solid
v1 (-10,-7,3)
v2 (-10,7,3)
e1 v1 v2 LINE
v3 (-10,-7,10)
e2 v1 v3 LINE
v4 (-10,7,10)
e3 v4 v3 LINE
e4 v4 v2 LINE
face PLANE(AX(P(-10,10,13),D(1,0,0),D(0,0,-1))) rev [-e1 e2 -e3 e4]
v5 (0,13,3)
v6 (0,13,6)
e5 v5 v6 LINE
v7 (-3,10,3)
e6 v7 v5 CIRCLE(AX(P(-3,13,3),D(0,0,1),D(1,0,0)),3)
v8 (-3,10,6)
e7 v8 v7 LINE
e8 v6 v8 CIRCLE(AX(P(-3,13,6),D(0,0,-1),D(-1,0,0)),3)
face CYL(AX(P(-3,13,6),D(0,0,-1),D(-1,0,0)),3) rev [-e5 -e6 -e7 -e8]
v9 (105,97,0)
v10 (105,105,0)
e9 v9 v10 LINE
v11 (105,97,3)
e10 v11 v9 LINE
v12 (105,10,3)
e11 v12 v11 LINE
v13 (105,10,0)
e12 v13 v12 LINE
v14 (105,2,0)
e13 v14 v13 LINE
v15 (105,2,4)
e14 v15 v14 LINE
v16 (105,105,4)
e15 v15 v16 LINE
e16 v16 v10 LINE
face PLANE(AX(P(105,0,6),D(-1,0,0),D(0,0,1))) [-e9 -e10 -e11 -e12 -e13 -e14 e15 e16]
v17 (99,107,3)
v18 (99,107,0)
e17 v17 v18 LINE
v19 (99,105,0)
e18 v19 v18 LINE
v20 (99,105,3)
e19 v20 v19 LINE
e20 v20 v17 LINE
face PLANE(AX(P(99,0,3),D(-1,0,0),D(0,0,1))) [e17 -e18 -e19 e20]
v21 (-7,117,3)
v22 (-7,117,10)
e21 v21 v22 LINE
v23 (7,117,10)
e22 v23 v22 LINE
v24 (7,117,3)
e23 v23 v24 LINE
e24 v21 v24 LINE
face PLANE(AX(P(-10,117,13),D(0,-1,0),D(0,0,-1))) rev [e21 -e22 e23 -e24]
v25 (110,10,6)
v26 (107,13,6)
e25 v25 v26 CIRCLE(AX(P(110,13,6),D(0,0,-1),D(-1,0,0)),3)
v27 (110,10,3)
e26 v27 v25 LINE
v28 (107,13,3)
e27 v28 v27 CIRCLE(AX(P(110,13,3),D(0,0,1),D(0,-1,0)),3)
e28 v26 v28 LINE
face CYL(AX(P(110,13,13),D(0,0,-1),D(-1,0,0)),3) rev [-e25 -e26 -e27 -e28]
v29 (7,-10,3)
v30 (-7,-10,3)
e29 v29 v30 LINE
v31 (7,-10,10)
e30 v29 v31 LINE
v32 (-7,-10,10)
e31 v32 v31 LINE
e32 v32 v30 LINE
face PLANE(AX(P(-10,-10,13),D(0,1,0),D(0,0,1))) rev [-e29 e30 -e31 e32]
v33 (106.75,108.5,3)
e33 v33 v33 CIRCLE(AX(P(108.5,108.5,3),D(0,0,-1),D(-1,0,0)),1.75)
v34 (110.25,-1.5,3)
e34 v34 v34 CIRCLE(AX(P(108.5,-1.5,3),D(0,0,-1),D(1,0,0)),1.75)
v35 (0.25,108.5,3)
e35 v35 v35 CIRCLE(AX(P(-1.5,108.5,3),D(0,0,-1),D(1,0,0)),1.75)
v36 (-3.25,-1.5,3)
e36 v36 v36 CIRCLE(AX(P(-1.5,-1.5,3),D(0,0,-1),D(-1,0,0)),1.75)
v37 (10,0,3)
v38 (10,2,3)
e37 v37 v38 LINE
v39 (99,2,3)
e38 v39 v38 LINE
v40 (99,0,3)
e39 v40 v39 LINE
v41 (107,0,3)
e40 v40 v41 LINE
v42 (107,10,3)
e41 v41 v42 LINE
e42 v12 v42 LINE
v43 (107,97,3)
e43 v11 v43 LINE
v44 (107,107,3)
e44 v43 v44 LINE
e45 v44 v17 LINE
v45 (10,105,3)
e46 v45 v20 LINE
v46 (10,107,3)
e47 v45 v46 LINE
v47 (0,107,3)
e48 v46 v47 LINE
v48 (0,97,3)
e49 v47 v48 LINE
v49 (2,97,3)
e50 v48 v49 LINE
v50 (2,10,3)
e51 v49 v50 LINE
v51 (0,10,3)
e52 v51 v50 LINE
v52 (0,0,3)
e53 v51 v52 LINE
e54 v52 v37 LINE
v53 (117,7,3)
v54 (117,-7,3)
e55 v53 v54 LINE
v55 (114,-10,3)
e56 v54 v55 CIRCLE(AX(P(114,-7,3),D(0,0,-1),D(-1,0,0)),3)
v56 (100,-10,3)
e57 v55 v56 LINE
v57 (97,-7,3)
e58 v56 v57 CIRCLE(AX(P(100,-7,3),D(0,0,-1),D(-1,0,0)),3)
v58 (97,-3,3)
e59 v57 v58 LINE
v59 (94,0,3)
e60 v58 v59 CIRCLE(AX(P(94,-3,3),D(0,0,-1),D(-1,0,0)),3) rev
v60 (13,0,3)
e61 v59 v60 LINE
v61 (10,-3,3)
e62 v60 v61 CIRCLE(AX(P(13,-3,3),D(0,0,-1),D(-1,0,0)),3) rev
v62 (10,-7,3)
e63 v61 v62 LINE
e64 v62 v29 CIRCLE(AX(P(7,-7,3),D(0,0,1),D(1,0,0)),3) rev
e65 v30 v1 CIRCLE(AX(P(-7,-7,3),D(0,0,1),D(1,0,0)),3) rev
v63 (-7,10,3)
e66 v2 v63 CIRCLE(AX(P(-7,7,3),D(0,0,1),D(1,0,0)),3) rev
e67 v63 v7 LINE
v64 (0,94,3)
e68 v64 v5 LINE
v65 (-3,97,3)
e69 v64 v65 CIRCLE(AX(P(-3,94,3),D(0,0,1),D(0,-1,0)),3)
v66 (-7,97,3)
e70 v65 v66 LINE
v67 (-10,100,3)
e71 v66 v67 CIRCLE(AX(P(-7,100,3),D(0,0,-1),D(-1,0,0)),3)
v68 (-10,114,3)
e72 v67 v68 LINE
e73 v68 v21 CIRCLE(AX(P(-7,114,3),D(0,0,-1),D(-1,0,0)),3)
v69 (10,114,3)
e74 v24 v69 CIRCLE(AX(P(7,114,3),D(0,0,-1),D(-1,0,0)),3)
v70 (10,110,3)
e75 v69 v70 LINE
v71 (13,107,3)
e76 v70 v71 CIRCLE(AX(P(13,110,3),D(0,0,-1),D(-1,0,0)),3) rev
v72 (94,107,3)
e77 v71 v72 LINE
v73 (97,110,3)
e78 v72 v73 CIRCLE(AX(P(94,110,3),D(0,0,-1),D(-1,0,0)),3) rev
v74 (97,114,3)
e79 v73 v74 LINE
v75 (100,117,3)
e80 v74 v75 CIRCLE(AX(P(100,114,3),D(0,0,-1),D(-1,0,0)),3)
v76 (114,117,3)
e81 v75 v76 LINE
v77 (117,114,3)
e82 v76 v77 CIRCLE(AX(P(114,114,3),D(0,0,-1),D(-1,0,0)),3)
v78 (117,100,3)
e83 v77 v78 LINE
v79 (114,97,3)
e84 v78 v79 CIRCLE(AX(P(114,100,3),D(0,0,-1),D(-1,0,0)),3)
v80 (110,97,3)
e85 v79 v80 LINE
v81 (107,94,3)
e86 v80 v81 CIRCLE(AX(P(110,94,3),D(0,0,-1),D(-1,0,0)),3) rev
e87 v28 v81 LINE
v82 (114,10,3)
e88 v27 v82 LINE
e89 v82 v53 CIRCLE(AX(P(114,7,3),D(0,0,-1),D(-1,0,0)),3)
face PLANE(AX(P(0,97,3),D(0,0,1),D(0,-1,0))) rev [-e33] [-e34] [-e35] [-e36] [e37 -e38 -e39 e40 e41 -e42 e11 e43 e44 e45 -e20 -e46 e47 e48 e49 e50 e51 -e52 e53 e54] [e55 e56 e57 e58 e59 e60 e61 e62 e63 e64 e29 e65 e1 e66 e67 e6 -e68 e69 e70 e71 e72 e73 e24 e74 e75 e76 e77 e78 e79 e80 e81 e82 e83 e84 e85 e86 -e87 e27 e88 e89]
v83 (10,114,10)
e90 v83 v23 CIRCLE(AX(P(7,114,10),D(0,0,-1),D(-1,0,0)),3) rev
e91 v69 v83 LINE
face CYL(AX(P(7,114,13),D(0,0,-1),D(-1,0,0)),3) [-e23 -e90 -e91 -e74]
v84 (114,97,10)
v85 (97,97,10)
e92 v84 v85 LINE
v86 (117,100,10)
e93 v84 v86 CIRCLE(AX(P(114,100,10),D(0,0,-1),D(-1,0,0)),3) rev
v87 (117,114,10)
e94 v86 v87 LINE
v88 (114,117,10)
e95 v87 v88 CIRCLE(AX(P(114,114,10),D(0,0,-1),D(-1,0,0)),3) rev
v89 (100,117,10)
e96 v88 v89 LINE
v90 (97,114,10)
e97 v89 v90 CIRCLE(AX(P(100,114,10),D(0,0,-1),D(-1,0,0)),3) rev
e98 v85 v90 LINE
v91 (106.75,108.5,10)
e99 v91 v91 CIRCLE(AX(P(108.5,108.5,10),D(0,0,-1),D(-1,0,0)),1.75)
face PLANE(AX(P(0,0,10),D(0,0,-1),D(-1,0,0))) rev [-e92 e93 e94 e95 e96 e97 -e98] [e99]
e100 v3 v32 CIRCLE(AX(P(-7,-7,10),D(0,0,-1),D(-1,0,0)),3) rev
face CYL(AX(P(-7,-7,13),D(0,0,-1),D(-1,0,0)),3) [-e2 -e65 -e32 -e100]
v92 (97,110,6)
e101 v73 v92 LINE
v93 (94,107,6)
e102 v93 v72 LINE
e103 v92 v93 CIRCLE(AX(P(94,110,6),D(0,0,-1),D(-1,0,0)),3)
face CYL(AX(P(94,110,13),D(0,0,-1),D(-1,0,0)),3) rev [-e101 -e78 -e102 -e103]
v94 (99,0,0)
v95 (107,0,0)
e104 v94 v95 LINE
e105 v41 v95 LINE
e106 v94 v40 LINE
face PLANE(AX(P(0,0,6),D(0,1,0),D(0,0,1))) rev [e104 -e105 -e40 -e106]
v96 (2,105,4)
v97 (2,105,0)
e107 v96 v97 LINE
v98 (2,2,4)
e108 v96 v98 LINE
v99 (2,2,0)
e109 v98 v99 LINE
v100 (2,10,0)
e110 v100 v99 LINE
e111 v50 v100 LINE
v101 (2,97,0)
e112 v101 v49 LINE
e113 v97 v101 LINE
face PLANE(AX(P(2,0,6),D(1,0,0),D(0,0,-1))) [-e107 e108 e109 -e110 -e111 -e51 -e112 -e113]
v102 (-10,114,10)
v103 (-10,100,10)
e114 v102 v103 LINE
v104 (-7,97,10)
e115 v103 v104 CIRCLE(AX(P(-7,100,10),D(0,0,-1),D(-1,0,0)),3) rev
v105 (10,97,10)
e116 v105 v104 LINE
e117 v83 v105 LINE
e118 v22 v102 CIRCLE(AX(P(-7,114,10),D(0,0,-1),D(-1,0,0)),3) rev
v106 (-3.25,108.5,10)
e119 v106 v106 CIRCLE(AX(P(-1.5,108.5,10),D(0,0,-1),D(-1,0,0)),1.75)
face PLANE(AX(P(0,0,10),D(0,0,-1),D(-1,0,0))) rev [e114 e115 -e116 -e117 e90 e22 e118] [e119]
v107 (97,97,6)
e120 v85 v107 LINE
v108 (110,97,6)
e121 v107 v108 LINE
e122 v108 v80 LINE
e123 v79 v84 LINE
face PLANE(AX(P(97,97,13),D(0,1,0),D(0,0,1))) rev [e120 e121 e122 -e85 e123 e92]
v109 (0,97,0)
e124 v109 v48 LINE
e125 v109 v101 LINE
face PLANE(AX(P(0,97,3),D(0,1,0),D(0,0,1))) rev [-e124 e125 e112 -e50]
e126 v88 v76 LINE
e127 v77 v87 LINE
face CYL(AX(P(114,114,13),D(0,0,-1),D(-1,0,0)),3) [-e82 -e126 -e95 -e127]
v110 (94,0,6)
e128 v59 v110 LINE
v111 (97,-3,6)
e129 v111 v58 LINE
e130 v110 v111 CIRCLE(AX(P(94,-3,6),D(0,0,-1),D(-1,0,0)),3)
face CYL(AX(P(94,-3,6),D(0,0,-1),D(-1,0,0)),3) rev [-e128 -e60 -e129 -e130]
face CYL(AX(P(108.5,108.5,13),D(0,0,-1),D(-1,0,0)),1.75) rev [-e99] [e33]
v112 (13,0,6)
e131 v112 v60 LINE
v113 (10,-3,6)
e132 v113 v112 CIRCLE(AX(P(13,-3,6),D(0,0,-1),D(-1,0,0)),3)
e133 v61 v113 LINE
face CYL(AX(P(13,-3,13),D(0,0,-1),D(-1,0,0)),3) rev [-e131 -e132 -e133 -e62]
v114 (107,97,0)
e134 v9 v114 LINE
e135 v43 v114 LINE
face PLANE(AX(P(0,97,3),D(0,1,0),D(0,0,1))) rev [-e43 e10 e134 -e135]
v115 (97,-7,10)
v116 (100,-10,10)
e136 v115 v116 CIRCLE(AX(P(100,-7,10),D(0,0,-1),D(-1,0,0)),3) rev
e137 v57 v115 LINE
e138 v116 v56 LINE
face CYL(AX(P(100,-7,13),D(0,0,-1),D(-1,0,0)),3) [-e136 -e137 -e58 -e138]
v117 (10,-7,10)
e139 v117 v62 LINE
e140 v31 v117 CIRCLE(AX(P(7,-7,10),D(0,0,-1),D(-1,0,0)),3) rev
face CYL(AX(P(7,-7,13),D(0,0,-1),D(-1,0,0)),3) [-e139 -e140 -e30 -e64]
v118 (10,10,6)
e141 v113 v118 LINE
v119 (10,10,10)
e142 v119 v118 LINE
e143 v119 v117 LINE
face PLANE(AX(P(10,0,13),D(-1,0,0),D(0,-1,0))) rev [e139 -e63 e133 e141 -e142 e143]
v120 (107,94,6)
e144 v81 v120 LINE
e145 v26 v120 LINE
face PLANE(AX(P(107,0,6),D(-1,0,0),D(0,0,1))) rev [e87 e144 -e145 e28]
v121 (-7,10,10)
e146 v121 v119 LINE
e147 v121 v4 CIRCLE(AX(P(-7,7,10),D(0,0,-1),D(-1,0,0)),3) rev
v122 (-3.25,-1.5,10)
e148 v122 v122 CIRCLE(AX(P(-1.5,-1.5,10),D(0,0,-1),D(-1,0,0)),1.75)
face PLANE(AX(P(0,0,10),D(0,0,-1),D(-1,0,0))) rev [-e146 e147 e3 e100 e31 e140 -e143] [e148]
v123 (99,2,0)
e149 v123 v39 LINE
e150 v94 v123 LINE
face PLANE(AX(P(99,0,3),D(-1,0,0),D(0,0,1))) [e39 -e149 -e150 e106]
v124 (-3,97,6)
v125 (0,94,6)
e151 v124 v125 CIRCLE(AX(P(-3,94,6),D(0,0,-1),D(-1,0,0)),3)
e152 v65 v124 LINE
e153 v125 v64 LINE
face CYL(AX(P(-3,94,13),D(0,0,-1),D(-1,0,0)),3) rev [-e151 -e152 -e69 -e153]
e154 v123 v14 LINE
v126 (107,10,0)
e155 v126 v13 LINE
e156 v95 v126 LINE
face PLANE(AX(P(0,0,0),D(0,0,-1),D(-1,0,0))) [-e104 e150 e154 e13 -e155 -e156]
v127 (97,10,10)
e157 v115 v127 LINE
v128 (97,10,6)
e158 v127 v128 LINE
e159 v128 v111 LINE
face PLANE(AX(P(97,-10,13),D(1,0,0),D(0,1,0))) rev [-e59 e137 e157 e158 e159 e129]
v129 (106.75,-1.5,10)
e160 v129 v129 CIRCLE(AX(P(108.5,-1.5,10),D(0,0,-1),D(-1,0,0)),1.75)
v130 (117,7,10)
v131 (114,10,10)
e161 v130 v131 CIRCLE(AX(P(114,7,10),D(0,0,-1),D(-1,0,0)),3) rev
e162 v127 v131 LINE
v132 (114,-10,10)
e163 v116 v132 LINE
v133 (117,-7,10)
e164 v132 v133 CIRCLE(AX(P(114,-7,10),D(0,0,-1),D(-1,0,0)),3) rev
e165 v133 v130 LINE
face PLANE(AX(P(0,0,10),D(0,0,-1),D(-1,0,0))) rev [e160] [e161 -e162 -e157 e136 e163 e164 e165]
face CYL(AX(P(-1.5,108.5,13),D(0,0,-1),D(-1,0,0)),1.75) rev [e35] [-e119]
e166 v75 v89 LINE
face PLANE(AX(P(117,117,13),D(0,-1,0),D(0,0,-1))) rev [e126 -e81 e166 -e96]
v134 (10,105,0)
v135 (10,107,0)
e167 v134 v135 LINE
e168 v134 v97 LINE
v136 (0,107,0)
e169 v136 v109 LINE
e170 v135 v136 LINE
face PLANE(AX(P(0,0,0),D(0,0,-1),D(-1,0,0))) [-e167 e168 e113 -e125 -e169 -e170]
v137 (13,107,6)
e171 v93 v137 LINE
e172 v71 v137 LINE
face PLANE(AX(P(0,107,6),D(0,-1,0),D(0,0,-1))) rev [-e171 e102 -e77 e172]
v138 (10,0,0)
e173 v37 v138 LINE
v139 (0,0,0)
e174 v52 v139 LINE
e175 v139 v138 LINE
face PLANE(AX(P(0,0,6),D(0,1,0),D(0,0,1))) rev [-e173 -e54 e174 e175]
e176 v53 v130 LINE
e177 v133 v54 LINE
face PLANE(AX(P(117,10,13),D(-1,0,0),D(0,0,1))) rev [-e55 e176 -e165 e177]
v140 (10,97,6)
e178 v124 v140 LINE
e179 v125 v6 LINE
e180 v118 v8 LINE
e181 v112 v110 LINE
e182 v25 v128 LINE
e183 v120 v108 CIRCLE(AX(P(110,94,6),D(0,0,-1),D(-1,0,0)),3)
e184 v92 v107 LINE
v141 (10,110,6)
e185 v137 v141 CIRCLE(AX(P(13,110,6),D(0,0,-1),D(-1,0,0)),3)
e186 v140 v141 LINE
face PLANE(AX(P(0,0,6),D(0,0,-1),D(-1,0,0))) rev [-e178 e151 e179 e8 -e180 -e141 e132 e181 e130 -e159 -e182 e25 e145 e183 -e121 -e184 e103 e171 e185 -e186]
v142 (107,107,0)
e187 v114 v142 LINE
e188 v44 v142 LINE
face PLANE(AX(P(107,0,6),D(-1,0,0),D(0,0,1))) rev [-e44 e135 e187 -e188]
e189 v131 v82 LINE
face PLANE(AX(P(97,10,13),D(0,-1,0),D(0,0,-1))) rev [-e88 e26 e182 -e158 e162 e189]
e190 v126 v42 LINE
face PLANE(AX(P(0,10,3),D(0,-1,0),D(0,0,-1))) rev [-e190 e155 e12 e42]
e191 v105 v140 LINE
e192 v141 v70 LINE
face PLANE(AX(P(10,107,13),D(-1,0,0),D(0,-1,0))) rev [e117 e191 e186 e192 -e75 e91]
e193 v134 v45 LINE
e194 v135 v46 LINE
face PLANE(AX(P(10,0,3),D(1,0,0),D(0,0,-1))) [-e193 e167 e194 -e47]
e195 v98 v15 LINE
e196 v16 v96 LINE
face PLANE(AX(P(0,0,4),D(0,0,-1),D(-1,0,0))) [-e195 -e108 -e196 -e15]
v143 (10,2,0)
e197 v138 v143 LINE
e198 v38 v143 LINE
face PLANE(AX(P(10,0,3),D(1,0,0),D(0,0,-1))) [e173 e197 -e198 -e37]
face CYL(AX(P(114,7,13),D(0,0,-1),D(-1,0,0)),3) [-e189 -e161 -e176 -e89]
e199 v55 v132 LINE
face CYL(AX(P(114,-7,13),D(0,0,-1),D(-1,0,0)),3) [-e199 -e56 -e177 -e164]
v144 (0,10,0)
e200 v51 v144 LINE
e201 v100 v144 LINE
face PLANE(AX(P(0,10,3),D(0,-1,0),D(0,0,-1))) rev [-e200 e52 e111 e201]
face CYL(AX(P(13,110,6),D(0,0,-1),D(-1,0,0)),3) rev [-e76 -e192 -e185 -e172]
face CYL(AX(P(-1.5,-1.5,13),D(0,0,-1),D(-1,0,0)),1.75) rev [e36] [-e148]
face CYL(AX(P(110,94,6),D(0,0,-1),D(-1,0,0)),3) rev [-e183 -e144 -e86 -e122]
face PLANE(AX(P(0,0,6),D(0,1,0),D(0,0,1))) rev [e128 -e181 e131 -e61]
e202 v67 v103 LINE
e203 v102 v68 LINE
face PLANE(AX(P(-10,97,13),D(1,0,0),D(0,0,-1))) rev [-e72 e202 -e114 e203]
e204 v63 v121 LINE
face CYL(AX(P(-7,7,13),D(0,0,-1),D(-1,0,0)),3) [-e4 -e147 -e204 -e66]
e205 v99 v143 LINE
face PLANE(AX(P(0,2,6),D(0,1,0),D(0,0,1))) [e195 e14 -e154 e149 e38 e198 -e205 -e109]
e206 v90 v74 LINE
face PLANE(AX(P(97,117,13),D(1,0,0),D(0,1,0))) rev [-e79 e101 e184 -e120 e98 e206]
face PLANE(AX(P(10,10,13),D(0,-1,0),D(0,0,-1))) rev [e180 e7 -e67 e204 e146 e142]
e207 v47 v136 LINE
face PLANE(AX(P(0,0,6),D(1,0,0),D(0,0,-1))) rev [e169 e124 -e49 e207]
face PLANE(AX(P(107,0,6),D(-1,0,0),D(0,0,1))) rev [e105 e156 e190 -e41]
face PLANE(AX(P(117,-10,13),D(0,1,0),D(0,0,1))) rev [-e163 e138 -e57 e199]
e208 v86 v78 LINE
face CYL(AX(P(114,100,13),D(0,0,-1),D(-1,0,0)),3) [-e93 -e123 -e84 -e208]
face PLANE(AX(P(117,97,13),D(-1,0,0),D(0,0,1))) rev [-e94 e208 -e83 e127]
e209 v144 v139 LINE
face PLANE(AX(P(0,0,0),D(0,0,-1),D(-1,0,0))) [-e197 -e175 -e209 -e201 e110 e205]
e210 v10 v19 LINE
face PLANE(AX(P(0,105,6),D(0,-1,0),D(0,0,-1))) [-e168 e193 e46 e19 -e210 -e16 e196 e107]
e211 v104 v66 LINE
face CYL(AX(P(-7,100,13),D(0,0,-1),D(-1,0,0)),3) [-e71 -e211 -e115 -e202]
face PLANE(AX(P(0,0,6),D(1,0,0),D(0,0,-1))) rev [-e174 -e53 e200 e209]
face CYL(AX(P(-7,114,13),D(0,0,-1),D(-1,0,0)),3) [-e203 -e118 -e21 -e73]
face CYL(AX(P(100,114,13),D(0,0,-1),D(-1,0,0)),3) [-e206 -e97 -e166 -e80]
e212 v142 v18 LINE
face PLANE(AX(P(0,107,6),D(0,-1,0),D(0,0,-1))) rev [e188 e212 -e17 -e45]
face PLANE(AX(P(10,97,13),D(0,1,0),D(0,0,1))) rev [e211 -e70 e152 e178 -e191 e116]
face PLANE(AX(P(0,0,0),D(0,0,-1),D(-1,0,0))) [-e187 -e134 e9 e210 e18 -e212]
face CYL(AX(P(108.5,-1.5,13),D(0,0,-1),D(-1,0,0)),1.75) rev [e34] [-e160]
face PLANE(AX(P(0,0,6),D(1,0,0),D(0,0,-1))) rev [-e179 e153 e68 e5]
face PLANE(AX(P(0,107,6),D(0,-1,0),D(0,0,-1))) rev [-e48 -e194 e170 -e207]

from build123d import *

# Parameters (mm, degrees)
SKETCH1_W               = 107
SKETCH1_H               = 107
BOSS_EXTRUDE1_DEPTH     = 6
SHELL6_T                = -2
CUT_EXTRUDE1_DEPTH      = 151.03332963
CUT_EXTRUDE1_DEPTH_BACK = 105
SKETCH2_W               = 89
SKETCH2_H               = 3
CUT_EXTRUDE2_DEPTH      = 152.439756999
CUT_EXTRUDE2_DEPTH_BACK = 152.439756999
SKETCH3_W               = 4.823716506
SKETCH3_H               = 87
SKETCH4_R               = 1.75
BOSS_EXTRUDE2_DEPTH     = 7
BOSS_EXTRUDE3_START     = 3
SKETCH5_R               = 1.75
BOSS_EXTRUDE3_DEPTH     = 3
SKETCH6_W               = 127
SKETCH6_H               = 127
CUT_EXTRUDE3_DEPTH      = 3
FILLET2_R               = 3


with BuildPart() as part:
    # Sketch1 → Boss-Extrude1 (new body)
    with BuildSketch(Plane.XY):
        with Locations((53.5, 53.5)):
            Rectangle(SKETCH1_W, SKETCH1_H)
    extrude(amount=BOSS_EXTRUDE1_DEPTH)

    # Shell6
    shell6_openings = [part.faces().sort_by_distance(p)[0] for p in [
        (53.5, 53.5, 0),
    ]]
    offset(amount=SHELL6_T, openings=shell6_openings, kind=Kind.INTERSECTION)

    # Sketch2 → Cut-Extrude1 (cut, two sides: drawn at the far end of the back side and taken through both)
    with BuildSketch(Plane.XZ.offset(-105).offset(-CUT_EXTRUDE1_DEPTH_BACK)):
        with Locations((54.5, 1.5)):
            Rectangle(SKETCH2_W, SKETCH2_H)
    extrude(amount=CUT_EXTRUDE1_DEPTH + CUT_EXTRUDE1_DEPTH_BACK, mode=Mode.SUBTRACT)

    # Sketch3 → Cut-Extrude2 (cut, two sides: drawn at the far end of the back side and taken through both)
    with BuildSketch(Plane(origin=(107, 0, 0), x_dir=(0, 0, -1), z_dir=(1, 0, 0)).offset(-CUT_EXTRUDE2_DEPTH_BACK)):
        with Locations((-0.588141747, 53.5)):
            Rectangle(SKETCH3_W, SKETCH3_H)
    extrude(amount=CUT_EXTRUDE2_DEPTH + CUT_EXTRUDE2_DEPTH_BACK, mode=Mode.SUBTRACT)

    # Sketch4 → Boss-Extrude2 (add)
    # profile 1 of 4: a face of its own
    with BuildSketch(Plane.XY.offset(6)):
        Polygon((10, 107), (10, 97), (-10, 97), (-10, 117), (10, 117), align=None)
        with Locations((-1.5, 108.5)):
            Circle(SKETCH4_R, mode=Mode.SUBTRACT)
    # profile 2 of 4: a face of its own
    with BuildSketch(Plane.XY.offset(6)):
        Polygon((97, 97), (117, 97), (117, 117), (97, 117), (97, 107), align=None)
        with Locations(Location((108.5, 108.5, 0), (0, 0, 180))):
            Circle(SKETCH4_R, mode=Mode.SUBTRACT)
    # profile 3 of 4: a face of its own
    with BuildSketch(Plane.XY.offset(6)):
        Polygon((117, -10), (97, -10), (97, 0), (97, 10), (117, 10), align=None)
        with Locations((108.5, -1.5)):
            Circle(SKETCH4_R, mode=Mode.SUBTRACT)
    # profile 4 of 4: a face of its own
    with BuildSketch(Plane.XY.offset(6)):
        Polygon((10, 0), (10, 10), (-10, 10), (-10, -10), (10, -10), align=None)
        with Locations(Location((-1.5, -1.5, 0), (0, 0, 180))):
            Circle(SKETCH4_R, mode=Mode.SUBTRACT)
    extrude(amount=BOSS_EXTRUDE2_DEPTH)

    # Sketch5 → Boss-Extrude3 (add)
    # profile 1 of 4: a face of its own
    with BuildSketch(Plane(origin=(0, 0, 6), x_dir=(-1, 0, 0), z_dir=(0, 0, -1)).offset(BOSS_EXTRUDE3_START)):
        Polygon((-107, 97), (-117, 97), (-117, 117), (-97, 117), (-97, 107), (-107, 107), align=None)
        with Locations((-108.5, 108.5)):
            Circle(SKETCH5_R, mode=Mode.SUBTRACT)
    # profile 2 of 4: a face of its own
    with BuildSketch(Plane(origin=(0, 0, 6), x_dir=(-1, 0, 0), z_dir=(0, 0, -1)).offset(BOSS_EXTRUDE3_START)):
        Polygon((10, 97), (10, 117), (-10, 117), (-10, 107), (0, 107), (0, 97), align=None)
        with Locations(Location((1.5, 108.5, 0), (0, 0, 180))):
            Circle(SKETCH5_R, mode=Mode.SUBTRACT)
    # profile 3 of 4: a face of its own
    with BuildSketch(Plane(origin=(0, 0, 6), x_dir=(-1, 0, 0), z_dir=(0, 0, -1)).offset(BOSS_EXTRUDE3_START)):
        Polygon((10, 10), (10, -10), (-10, -10), (-10, 0), (0, 0), (0, 10), align=None)
        with Locations((1.5, -1.5)):
            Circle(SKETCH5_R, mode=Mode.SUBTRACT)
    # profile 4 of 4: a face of its own
    with BuildSketch(Plane(origin=(0, 0, 6), x_dir=(-1, 0, 0), z_dir=(0, 0, -1)).offset(BOSS_EXTRUDE3_START)):
        Polygon((-117, 10), (-117, -10), (-97, -10), (-97, 0), (-107, 0), (-107, 10), align=None)
        with Locations(Location((-108.5, -1.5, 0), (0, 0, 180))):
            Circle(SKETCH5_R, mode=Mode.SUBTRACT)
    extrude(amount=-BOSS_EXTRUDE3_DEPTH)

    # Sketch6 → Cut-Extrude3 (cut)
    with BuildSketch(Plane.XY.offset(13)):
        with Locations((53.5, 53.5)):
            Rectangle(SKETCH6_W, SKETCH6_H)
    extrude(amount=-CUT_EXTRUDE3_DEPTH, mode=Mode.SUBTRACT)

    # Fillet2
    # the kernel refuses this fillet: 3 mm, written as the material it adds along each edge
    with BuildSketch(Plane(origin=(107, 97, 3), x_dir=(0, -1, 0), z_dir=(0, 0, 1)), Plane(origin=(0, 97, 3), x_dir=(-1, 0, 0), z_dir=(0, 0, 1)), Plane(origin=(10, 107, 3), x_dir=(1, 0, 0), z_dir=(0, 0, 1)), Plane(origin=(0, 10, 3), x_dir=(0, 1, 0), z_dir=(0, 0, 1)), Plane(origin=(107, 10, 3), x_dir=(1, 0, 0), z_dir=(0, 0, 1)), Plane(origin=(97, 0, 3), x_dir=(-1, 0, 0), z_dir=(0, 0, 1))) as fillet2_piece_1:
        with BuildLine():
            CenterArc((FILLET2_R, FILLET2_R), FILLET2_R, 180, 90)
            Line((0, FILLET2_R), (0, 0))
            Line((0, 0), (FILLET2_R, 0))
        make_face()
    extrude(amount=3)
    with BuildSketch(Plane(origin=(97, 107, 3), x_dir=(-1, 0, 0), z_dir=(0, 0, 1)), Plane(origin=(10, 0, 3), x_dir=(1, 0, 0), z_dir=(0, 0, 1))) as fillet2_piece_2:
        with BuildLine():
            CenterArc((FILLET2_R, -FILLET2_R), FILLET2_R, 90, 90)
            Line((0, -FILLET2_R), (0, 0))
            Line((0, 0), (FILLET2_R, 0))
        make_face()
    extrude(amount=3)
    # the kernel refuses this fillet: 3 mm, written as the material it takes off along each edge
    with BuildSketch(Plane(origin=(-10, -10, -4.5), x_dir=(1, 0, 0), z_dir=(0, 0, 1)), Plane(origin=(10, -10, -4.5), x_dir=(0, 1, 0), z_dir=(0, 0, 1)), Plane(origin=(-10, 10, 17.5), x_dir=(1, 0, 0), z_dir=(0, 0, -1)), Plane(origin=(97, -10, -4.5), x_dir=(1, 0, 0), z_dir=(0, 0, 1)), Plane(origin=(117, -10, -4.5), x_dir=(0, 1, 0), z_dir=(0, 0, 1)), Plane(origin=(117, 10, -4.5), x_dir=(-1, 0, 0), z_dir=(0, 0, 1)), Plane(origin=(117, 97, -4.5), x_dir=(0, 1, 0), z_dir=(0, 0, 1)), Plane(origin=(10, 117, -4.5), x_dir=(-1, 0, 0), z_dir=(0, 0, 1))) as fillet2_2_piece_1:
        with BuildLine():
            CenterArc((FILLET2_R, FILLET2_R), FILLET2_R, 180, 90)
            Line((0, FILLET2_R), (0, 0))
            Line((0, 0), (FILLET2_R, 0))
        make_face()
    extrude(amount=22, mode=Mode.SUBTRACT)
    with BuildSketch(Plane(origin=(97, 117, 17.5), x_dir=(0, -1, 0), z_dir=(0, 0, -1)), Plane(origin=(117, 117, 17.5), x_dir=(-1, 0, 0), z_dir=(0, 0, -1)), Plane(origin=(-10, 97, 17.5), x_dir=(1, 0, 0), z_dir=(0, 0, -1)), Plane(origin=(-10, 117, 17.5), x_dir=(0, -1, 0), z_dir=(0, 0, -1))) as fillet2_2_piece_2:
        with BuildLine():
            CenterArc((FILLET2_R, -FILLET2_R), FILLET2_R, 90, 90)
            Line((0, -FILLET2_R), (0, 0))
            Line((0, 0), (FILLET2_R, 0))
        make_face()
    extrude(amount=22, mode=Mode.SUBTRACT)


solid = part.part
